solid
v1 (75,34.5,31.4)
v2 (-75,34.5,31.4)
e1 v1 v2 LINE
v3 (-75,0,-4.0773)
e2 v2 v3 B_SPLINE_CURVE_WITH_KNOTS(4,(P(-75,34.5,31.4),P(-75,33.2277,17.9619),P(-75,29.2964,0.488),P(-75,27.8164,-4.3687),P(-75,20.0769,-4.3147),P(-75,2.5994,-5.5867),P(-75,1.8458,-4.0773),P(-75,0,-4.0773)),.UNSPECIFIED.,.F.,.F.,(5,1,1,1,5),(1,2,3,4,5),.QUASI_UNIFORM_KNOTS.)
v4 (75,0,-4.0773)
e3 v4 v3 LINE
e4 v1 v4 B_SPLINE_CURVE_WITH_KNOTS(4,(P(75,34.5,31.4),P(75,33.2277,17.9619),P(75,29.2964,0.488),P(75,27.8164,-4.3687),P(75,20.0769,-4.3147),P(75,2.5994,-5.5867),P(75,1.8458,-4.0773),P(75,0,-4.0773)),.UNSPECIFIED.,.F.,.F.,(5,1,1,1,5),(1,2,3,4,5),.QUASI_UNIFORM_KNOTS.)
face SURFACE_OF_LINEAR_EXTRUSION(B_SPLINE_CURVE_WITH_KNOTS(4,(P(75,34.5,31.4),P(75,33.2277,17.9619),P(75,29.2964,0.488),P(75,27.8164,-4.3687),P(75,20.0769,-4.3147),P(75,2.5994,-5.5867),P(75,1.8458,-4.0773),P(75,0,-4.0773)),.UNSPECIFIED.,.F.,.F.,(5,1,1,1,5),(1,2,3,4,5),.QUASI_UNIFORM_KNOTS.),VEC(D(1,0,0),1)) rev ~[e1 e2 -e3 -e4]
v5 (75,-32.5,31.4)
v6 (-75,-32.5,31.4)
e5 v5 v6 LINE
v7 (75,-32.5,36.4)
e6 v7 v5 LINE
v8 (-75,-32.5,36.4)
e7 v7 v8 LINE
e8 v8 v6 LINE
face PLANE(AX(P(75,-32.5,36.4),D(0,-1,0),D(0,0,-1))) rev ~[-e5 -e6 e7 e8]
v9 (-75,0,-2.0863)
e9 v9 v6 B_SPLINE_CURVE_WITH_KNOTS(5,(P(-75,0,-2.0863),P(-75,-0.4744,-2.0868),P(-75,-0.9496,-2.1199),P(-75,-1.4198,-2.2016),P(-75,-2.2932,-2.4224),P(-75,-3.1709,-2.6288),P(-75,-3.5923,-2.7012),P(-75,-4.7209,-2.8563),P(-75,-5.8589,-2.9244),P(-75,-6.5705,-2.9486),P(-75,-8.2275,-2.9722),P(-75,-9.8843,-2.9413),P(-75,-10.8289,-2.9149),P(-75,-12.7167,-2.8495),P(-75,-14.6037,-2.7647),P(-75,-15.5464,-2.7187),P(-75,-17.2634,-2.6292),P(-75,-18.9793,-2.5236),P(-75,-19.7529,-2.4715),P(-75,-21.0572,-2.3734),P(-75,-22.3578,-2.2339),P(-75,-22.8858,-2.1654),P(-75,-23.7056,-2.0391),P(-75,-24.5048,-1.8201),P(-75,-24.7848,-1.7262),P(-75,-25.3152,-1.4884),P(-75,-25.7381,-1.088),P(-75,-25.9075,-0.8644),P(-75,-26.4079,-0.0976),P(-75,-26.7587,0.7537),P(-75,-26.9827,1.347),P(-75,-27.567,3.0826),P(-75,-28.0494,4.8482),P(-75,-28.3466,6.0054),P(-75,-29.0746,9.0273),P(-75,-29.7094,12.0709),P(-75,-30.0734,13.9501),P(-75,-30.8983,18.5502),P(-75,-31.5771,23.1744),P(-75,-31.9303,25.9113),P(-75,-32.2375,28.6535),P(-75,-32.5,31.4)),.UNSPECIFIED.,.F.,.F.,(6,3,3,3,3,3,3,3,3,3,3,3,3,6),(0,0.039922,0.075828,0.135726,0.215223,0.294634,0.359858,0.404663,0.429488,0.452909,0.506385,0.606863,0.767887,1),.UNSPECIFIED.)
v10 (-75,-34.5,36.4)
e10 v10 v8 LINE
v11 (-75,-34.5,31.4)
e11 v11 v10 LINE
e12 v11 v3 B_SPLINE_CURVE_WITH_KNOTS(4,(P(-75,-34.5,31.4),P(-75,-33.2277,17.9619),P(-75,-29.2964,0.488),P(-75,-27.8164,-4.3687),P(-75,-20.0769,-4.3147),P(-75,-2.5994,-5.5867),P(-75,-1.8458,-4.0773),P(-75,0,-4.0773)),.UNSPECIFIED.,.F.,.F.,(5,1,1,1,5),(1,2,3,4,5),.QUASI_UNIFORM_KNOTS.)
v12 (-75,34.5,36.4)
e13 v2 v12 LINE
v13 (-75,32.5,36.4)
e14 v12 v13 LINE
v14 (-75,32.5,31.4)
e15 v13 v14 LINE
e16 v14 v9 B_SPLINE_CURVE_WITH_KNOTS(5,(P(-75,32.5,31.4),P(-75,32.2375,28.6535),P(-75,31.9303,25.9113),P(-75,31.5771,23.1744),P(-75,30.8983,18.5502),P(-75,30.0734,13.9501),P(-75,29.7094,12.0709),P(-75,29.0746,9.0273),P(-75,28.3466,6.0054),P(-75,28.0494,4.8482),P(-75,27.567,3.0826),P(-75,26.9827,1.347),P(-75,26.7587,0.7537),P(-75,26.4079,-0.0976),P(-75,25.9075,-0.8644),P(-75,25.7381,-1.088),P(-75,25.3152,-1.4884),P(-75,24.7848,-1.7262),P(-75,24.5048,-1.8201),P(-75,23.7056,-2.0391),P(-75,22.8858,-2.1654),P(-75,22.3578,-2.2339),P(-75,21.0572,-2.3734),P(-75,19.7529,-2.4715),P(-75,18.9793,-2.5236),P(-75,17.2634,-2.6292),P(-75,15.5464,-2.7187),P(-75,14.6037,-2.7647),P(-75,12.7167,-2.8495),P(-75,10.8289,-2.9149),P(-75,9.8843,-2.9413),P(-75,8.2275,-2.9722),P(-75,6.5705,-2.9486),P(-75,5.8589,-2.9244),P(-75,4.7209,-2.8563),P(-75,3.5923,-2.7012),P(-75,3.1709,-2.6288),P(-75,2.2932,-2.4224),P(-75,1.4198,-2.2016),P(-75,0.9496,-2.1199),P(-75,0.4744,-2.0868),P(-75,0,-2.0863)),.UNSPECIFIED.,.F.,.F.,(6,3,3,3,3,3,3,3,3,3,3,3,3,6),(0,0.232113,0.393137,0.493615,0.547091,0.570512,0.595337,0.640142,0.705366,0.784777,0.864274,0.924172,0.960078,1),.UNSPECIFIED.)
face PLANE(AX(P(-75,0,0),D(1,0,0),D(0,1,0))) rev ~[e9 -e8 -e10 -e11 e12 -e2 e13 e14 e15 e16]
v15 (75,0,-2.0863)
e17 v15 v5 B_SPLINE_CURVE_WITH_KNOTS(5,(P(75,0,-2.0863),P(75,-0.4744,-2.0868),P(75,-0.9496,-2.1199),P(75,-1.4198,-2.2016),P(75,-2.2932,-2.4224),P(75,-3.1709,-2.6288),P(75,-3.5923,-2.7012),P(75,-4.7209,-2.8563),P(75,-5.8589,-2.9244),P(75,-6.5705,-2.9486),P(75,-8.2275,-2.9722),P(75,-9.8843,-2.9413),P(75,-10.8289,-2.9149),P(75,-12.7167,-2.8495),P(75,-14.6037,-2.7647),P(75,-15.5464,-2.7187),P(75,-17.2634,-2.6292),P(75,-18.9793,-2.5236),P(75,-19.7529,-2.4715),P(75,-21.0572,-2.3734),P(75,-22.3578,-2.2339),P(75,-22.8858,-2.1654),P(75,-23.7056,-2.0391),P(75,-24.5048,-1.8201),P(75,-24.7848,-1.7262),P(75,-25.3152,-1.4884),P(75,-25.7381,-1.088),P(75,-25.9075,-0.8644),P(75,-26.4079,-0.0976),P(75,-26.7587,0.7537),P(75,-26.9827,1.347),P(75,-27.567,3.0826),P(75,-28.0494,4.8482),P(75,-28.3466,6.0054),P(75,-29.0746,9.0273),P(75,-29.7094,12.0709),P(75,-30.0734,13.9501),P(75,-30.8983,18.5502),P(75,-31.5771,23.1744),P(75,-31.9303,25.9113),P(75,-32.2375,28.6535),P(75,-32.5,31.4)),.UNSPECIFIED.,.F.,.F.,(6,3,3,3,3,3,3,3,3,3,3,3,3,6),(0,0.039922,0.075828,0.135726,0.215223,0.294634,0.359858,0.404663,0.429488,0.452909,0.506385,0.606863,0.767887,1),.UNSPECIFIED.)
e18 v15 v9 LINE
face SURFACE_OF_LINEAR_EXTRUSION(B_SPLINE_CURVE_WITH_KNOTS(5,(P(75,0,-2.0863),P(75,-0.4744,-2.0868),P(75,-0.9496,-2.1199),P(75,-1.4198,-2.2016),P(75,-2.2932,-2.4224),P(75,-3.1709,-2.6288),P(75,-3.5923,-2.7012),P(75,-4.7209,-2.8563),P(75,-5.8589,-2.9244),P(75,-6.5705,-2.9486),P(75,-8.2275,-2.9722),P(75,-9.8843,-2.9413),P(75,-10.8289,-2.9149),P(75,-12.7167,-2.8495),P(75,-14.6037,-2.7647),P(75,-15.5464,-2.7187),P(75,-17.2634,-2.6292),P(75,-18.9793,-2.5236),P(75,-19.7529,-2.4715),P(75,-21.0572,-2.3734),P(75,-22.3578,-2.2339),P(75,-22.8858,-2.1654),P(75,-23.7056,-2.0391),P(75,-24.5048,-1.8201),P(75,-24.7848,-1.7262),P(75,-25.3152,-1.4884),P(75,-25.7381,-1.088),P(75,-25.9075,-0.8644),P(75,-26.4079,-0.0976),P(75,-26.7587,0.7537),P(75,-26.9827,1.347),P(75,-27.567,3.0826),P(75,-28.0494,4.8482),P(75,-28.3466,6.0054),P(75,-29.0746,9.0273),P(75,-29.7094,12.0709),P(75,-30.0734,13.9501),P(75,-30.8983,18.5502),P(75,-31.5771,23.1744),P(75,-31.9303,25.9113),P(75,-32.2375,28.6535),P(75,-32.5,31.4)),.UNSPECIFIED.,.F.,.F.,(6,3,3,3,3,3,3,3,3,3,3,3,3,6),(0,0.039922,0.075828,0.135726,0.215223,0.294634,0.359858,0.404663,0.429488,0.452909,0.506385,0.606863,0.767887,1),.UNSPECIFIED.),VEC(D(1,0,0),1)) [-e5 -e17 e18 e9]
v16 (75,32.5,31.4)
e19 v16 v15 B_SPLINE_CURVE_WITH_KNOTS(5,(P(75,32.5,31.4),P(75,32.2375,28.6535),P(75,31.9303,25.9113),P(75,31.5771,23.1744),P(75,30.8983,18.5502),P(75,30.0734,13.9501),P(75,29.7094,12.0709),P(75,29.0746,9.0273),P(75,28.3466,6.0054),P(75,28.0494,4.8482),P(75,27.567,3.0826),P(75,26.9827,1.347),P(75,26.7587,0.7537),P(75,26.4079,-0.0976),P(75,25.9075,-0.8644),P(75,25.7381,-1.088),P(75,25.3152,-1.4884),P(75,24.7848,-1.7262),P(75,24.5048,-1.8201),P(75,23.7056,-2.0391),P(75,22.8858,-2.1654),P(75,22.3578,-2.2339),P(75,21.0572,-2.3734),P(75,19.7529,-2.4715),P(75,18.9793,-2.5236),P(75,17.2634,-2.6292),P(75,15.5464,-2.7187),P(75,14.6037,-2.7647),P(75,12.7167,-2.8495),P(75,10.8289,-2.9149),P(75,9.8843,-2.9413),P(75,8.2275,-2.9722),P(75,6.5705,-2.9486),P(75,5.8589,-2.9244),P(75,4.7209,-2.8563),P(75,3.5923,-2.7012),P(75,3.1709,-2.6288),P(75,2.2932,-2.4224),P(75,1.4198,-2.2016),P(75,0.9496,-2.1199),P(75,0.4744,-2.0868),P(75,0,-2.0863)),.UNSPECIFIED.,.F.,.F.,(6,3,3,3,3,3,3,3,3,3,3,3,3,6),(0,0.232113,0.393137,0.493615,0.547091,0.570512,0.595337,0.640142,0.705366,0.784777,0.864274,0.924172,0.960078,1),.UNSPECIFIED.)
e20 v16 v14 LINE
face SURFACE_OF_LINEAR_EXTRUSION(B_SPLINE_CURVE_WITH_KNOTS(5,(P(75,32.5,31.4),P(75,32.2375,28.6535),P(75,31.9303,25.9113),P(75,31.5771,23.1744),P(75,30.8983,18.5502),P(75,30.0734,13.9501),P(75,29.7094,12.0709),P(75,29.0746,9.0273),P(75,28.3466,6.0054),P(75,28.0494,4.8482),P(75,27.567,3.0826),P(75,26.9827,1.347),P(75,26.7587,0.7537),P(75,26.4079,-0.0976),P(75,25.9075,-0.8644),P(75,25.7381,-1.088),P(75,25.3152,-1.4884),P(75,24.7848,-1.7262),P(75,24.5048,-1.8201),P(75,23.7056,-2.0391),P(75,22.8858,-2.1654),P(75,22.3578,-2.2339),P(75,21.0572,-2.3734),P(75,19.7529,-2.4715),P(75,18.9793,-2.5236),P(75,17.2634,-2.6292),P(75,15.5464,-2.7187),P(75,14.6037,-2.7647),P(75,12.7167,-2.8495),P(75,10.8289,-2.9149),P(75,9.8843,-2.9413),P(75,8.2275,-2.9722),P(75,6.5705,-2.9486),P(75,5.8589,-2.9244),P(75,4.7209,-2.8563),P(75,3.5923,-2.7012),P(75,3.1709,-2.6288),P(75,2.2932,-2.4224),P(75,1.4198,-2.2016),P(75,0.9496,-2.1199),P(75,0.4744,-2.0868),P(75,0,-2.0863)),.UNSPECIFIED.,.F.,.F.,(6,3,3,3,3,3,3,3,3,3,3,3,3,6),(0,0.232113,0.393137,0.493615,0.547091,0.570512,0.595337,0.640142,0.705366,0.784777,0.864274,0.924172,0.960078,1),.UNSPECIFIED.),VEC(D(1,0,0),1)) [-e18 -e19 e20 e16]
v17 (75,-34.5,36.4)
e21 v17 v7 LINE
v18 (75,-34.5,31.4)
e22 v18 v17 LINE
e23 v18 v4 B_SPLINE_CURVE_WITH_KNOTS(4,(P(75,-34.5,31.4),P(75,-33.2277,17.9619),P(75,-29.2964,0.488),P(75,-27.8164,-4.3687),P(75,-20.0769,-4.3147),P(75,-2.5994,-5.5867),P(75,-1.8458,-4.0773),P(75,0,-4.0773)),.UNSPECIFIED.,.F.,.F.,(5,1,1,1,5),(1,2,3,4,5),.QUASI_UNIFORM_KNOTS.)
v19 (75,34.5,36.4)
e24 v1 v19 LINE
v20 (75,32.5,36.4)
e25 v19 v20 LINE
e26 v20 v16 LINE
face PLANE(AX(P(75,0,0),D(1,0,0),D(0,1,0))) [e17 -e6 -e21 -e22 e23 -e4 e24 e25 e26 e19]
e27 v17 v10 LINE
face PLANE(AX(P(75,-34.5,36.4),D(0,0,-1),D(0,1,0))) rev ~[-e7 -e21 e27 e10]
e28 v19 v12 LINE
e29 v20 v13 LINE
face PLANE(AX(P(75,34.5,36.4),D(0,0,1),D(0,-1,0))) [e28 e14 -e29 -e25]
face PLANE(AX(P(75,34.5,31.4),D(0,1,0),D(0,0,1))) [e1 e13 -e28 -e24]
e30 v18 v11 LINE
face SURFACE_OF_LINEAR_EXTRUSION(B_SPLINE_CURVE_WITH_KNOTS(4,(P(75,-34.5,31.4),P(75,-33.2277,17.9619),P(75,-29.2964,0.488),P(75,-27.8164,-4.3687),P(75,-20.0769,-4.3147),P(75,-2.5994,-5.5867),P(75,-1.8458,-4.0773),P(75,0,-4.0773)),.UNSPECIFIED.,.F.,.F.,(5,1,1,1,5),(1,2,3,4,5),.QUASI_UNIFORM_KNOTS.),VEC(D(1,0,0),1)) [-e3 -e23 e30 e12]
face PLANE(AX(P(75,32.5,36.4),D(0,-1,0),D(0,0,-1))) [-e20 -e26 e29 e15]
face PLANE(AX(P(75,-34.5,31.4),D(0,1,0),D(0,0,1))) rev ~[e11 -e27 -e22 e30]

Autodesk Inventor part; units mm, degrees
ref_plane "YZ Plane" through (0, 0, 0) normal (1, 0, 0) x (0, 1, 0)
sketch "Sketch1" plane through (0, 0, 0) normal (1, 0, 0) x (0, 1, 0)
  line L0 (0, 47.2251) -> (0, -28.5505) construction
  line L1 (32.5, 31.4) -> (34.5, 31.4) construction
  line L2 (34.5, 31.4) -> (34.5, 36.4)
  line L3 (34.5, 36.4) -> (32.5, 36.4)
  line L4 (32.5, 36.4) -> (32.5, 31.4)
  line L5 (34.5, 31.4) -> (33.2277, 17.9619) construction
  line L6 (33.2277, 17.9619) -> (29.2964, 0.488) construction
  line L7 (29.2964, 0.488) -> (27.8164, -4.3687) construction
  line L8 (27.8164, -4.3687) -> (20.0769, -4.3147) construction
  line L9 (20.0769, -4.3147) -> (2.5994, -5.5867) construction
  line L10 (2.5994, -5.5867) -> (1.8458, -4.0773) construction
  line L11 (1.8458, -4.0773) -> (0, -4.0773) construction
  spline S0 degree 4 poles (34.5, 31.4) (33.2277, 17.9619) (29.2964, 0.488) (27.8164, -4.3687) (20.0769, -4.3147) (2.5994, -5.5867) (1.8458, -4.0773) (0, -4.0773) knots 1 1 1 1 1 2 3 4 5 5 5 5 5
  line L12 (-32.5, 31.4) -> (-34.5, 31.4) construction
  line L13 (-34.5, 31.4) -> (-34.5, 36.4)
  line L14 (-34.5, 36.4) -> (-32.5, 36.4)
  line L15 (-32.5, 36.4) -> (-32.5, 31.4)
  line L16 (-34.5, 31.4) -> (-33.2277, 17.9619) construction
  line L17 (-33.2277, 17.9619) -> (-29.2964, 0.488) construction
  line L18 (-29.2964, 0.488) -> (-27.8164, -4.3687) construction
  line L19 (-27.8164, -4.3687) -> (-20.0769, -4.3147) construction
  line L20 (-20.0769, -4.3147) -> (-2.5994, -5.5867) construction
  line L21 (-2.5994, -5.5867) -> (-1.8458, -4.0773) construction
  line L22 (-1.8458, -4.0773) -> (0, -4.0773) construction
  spline S1 degree 4 poles (-34.5, 31.4) (-33.2277, 17.9619) (-29.2964, 0.488) (-27.8164, -4.3687) (-20.0769, -4.3147) (-2.5994, -5.5867) (-1.8458, -4.0773) (0, -4.0773) knots 1 1 1 1 1 2 3 4 5 5 5 5 5
  line L23 (-68.4509, 0) -> (68.4509, 0) construction
  spline S2 degree 5 poles (32.5, 31.4) (32.2375, 28.6535) (31.9303, 25.9113) (31.5771, 23.1744) (30.8983, 18.5502) (30.0734, 13.9501) (29.7094, 12.0709) (29.0746, 9.0273) (28.3466, 6.0054) (28.0494, 4.8482) (27.567, 3.0826) (26.9827, 1.347) (26.7587, 0.7537) (26.4079, -0.0976) (25.9075, -0.8644) (25.7381, -1.088) (25.3152, -1.4884) (24.7848, -1.7262) (24.5048, -1.8201) (23.7056, -2.0391) (22.8858, -2.1654) (22.3578, -2.2339) (21.0572, -2.3734) (19.7529, -2.4715) (18.9793, -2.5236) (17.2634, -2.6292) (15.5464, -2.7187) (14.6037, -2.7647) (12.7167, -2.8495) (10.8289, -2.9149) (9.8843, -2.9413) (8.2275, -2.9722) (6.5705, -2.9486) (5.8589, -2.9244) (4.7209, -2.8563) (3.5923, -2.7012) (3.1709, -2.6288) (2.2932, -2.4224) (1.4198, -2.2016) (0.9496, -2.1199) (0.4744, -2.0868) (0, -2.0863) knots 0 0 0 0 0 0 0.232113 0.232113 0.232113 0.393137 0.393137 0.393137 0.493615 0.493615 0.493615 0.547091 0.547091 0.547091 0.570512 0.570512 0.570512 0.595337 0.595337 0.595337 0.640142 0.640142 0.640142 0.705366 0.705366 0.705366 0.784777 0.784777 0.784777 0.864274 0.864274 0.864274 0.924172 0.924172 0.924172 0.960078 0.960078 0.960078 1 1 1 1 1 1
  spline S3 degree 5 poles (0, -2.0863) (-0.4744, -2.0868) (-0.9496, -2.1199) (-1.4198, -2.2016) (-2.2932, -2.4224) (-3.1709, -2.6288) (-3.5923, -2.7012) (-4.7209, -2.8563) (-5.8589, -2.9244) (-6.5705, -2.9486) (-8.2275, -2.9722) (-9.8843, -2.9413) (-10.8289, -2.9149) (-12.7167, -2.8495) (-14.6037, -2.7647) (-15.5464, -2.7187) (-17.2634, -2.6292) (-18.9793, -2.5236) (-19.7529, -2.4715) (-21.0572, -2.3734) (-22.3578, -2.2339) (-22.8858, -2.1654) (-23.7056, -2.0391) (-24.5048, -1.8201) (-24.7848, -1.7262) (-25.3152, -1.4884) (-25.7381, -1.088) (-25.9075, -0.8644) (-26.4079, -0.0976) (-26.7587, 0.7537) (-26.9827, 1.347) (-27.567, 3.0826) (-28.0494, 4.8482) (-28.3466, 6.0054) (-29.0746, 9.0273) (-29.7094, 12.0709) (-30.0734, 13.9501) (-30.8983, 18.5502) (-31.5771, 23.1744) (-31.9303, 25.9113) (-32.2375, 28.6535) (-32.5, 31.4) knots 0 0 0 0 0 0 0.039922 0.039922 0.039922 0.075828 0.075828 0.075828 0.135726 0.135726 0.135726 0.215223 0.215223 0.215223 0.294634 0.294634 0.294634 0.359858 0.359858 0.359858 0.404663 0.404663 0.404663 0.429488 0.429488 0.429488 0.452909 0.452909 0.452909 0.506385 0.506385 0.506385 0.606863 0.606863 0.606863 0.767887 0.767887 0.767887 1 1 1 1 1 1
  point P0 (0, 0)
  point P1 (24, 0)
  point P2 (-24, 0)
  point P3 (5, 0.0487)
  dimension "d0" = 24
  dimension "d3" = 2
  dimension "d7" = 5
  dimension "d8" = 5
ref_plane "Work Plane1" through (75, 32.5, 31.4) normal (-1, 0, 0) x (0, 0, 1)
ref_plane "Work Plane2" through (-75, 32.5, 31.4) normal (1, 0, 0) x (0, 1, 0)
extrude "Extrusion1" add sketch "Sketch1" against normal up to surface (150 mm away) from surface at 75
equation "\"d3\" = Cover_Thickness"
equation "\"d8\" = Heatsink_Thickness"
equation "\"Heatsink_Thickness\" = 5"
equation "\"Heatsink_Width\" = 65"
equation "\"Cover_Thickness\" = 2"
equation "\"PowerPCB_Minus_Height\" = 1.2"
equation "\"PowerPCB_Width\" = 63"
equation "\"Interface_Thickness\" = 7"
equation "\"PowerPCB_Thickness\" = 3"
equation "\"PowerPCB_Plus_Height\" = 8"
equation "\"LogicPCB_Width\" = 55"
equation "\"LogicPCB_Thickness\" = 2"
equation "\"LogicPCB_Plus_Height\" = 8"
equation "\"HostPCB_Thickness\" = 1.2"
equation "\"HostPCB_Plus_Height\" = 8"
properties part number "Cover" material "CFRP"
